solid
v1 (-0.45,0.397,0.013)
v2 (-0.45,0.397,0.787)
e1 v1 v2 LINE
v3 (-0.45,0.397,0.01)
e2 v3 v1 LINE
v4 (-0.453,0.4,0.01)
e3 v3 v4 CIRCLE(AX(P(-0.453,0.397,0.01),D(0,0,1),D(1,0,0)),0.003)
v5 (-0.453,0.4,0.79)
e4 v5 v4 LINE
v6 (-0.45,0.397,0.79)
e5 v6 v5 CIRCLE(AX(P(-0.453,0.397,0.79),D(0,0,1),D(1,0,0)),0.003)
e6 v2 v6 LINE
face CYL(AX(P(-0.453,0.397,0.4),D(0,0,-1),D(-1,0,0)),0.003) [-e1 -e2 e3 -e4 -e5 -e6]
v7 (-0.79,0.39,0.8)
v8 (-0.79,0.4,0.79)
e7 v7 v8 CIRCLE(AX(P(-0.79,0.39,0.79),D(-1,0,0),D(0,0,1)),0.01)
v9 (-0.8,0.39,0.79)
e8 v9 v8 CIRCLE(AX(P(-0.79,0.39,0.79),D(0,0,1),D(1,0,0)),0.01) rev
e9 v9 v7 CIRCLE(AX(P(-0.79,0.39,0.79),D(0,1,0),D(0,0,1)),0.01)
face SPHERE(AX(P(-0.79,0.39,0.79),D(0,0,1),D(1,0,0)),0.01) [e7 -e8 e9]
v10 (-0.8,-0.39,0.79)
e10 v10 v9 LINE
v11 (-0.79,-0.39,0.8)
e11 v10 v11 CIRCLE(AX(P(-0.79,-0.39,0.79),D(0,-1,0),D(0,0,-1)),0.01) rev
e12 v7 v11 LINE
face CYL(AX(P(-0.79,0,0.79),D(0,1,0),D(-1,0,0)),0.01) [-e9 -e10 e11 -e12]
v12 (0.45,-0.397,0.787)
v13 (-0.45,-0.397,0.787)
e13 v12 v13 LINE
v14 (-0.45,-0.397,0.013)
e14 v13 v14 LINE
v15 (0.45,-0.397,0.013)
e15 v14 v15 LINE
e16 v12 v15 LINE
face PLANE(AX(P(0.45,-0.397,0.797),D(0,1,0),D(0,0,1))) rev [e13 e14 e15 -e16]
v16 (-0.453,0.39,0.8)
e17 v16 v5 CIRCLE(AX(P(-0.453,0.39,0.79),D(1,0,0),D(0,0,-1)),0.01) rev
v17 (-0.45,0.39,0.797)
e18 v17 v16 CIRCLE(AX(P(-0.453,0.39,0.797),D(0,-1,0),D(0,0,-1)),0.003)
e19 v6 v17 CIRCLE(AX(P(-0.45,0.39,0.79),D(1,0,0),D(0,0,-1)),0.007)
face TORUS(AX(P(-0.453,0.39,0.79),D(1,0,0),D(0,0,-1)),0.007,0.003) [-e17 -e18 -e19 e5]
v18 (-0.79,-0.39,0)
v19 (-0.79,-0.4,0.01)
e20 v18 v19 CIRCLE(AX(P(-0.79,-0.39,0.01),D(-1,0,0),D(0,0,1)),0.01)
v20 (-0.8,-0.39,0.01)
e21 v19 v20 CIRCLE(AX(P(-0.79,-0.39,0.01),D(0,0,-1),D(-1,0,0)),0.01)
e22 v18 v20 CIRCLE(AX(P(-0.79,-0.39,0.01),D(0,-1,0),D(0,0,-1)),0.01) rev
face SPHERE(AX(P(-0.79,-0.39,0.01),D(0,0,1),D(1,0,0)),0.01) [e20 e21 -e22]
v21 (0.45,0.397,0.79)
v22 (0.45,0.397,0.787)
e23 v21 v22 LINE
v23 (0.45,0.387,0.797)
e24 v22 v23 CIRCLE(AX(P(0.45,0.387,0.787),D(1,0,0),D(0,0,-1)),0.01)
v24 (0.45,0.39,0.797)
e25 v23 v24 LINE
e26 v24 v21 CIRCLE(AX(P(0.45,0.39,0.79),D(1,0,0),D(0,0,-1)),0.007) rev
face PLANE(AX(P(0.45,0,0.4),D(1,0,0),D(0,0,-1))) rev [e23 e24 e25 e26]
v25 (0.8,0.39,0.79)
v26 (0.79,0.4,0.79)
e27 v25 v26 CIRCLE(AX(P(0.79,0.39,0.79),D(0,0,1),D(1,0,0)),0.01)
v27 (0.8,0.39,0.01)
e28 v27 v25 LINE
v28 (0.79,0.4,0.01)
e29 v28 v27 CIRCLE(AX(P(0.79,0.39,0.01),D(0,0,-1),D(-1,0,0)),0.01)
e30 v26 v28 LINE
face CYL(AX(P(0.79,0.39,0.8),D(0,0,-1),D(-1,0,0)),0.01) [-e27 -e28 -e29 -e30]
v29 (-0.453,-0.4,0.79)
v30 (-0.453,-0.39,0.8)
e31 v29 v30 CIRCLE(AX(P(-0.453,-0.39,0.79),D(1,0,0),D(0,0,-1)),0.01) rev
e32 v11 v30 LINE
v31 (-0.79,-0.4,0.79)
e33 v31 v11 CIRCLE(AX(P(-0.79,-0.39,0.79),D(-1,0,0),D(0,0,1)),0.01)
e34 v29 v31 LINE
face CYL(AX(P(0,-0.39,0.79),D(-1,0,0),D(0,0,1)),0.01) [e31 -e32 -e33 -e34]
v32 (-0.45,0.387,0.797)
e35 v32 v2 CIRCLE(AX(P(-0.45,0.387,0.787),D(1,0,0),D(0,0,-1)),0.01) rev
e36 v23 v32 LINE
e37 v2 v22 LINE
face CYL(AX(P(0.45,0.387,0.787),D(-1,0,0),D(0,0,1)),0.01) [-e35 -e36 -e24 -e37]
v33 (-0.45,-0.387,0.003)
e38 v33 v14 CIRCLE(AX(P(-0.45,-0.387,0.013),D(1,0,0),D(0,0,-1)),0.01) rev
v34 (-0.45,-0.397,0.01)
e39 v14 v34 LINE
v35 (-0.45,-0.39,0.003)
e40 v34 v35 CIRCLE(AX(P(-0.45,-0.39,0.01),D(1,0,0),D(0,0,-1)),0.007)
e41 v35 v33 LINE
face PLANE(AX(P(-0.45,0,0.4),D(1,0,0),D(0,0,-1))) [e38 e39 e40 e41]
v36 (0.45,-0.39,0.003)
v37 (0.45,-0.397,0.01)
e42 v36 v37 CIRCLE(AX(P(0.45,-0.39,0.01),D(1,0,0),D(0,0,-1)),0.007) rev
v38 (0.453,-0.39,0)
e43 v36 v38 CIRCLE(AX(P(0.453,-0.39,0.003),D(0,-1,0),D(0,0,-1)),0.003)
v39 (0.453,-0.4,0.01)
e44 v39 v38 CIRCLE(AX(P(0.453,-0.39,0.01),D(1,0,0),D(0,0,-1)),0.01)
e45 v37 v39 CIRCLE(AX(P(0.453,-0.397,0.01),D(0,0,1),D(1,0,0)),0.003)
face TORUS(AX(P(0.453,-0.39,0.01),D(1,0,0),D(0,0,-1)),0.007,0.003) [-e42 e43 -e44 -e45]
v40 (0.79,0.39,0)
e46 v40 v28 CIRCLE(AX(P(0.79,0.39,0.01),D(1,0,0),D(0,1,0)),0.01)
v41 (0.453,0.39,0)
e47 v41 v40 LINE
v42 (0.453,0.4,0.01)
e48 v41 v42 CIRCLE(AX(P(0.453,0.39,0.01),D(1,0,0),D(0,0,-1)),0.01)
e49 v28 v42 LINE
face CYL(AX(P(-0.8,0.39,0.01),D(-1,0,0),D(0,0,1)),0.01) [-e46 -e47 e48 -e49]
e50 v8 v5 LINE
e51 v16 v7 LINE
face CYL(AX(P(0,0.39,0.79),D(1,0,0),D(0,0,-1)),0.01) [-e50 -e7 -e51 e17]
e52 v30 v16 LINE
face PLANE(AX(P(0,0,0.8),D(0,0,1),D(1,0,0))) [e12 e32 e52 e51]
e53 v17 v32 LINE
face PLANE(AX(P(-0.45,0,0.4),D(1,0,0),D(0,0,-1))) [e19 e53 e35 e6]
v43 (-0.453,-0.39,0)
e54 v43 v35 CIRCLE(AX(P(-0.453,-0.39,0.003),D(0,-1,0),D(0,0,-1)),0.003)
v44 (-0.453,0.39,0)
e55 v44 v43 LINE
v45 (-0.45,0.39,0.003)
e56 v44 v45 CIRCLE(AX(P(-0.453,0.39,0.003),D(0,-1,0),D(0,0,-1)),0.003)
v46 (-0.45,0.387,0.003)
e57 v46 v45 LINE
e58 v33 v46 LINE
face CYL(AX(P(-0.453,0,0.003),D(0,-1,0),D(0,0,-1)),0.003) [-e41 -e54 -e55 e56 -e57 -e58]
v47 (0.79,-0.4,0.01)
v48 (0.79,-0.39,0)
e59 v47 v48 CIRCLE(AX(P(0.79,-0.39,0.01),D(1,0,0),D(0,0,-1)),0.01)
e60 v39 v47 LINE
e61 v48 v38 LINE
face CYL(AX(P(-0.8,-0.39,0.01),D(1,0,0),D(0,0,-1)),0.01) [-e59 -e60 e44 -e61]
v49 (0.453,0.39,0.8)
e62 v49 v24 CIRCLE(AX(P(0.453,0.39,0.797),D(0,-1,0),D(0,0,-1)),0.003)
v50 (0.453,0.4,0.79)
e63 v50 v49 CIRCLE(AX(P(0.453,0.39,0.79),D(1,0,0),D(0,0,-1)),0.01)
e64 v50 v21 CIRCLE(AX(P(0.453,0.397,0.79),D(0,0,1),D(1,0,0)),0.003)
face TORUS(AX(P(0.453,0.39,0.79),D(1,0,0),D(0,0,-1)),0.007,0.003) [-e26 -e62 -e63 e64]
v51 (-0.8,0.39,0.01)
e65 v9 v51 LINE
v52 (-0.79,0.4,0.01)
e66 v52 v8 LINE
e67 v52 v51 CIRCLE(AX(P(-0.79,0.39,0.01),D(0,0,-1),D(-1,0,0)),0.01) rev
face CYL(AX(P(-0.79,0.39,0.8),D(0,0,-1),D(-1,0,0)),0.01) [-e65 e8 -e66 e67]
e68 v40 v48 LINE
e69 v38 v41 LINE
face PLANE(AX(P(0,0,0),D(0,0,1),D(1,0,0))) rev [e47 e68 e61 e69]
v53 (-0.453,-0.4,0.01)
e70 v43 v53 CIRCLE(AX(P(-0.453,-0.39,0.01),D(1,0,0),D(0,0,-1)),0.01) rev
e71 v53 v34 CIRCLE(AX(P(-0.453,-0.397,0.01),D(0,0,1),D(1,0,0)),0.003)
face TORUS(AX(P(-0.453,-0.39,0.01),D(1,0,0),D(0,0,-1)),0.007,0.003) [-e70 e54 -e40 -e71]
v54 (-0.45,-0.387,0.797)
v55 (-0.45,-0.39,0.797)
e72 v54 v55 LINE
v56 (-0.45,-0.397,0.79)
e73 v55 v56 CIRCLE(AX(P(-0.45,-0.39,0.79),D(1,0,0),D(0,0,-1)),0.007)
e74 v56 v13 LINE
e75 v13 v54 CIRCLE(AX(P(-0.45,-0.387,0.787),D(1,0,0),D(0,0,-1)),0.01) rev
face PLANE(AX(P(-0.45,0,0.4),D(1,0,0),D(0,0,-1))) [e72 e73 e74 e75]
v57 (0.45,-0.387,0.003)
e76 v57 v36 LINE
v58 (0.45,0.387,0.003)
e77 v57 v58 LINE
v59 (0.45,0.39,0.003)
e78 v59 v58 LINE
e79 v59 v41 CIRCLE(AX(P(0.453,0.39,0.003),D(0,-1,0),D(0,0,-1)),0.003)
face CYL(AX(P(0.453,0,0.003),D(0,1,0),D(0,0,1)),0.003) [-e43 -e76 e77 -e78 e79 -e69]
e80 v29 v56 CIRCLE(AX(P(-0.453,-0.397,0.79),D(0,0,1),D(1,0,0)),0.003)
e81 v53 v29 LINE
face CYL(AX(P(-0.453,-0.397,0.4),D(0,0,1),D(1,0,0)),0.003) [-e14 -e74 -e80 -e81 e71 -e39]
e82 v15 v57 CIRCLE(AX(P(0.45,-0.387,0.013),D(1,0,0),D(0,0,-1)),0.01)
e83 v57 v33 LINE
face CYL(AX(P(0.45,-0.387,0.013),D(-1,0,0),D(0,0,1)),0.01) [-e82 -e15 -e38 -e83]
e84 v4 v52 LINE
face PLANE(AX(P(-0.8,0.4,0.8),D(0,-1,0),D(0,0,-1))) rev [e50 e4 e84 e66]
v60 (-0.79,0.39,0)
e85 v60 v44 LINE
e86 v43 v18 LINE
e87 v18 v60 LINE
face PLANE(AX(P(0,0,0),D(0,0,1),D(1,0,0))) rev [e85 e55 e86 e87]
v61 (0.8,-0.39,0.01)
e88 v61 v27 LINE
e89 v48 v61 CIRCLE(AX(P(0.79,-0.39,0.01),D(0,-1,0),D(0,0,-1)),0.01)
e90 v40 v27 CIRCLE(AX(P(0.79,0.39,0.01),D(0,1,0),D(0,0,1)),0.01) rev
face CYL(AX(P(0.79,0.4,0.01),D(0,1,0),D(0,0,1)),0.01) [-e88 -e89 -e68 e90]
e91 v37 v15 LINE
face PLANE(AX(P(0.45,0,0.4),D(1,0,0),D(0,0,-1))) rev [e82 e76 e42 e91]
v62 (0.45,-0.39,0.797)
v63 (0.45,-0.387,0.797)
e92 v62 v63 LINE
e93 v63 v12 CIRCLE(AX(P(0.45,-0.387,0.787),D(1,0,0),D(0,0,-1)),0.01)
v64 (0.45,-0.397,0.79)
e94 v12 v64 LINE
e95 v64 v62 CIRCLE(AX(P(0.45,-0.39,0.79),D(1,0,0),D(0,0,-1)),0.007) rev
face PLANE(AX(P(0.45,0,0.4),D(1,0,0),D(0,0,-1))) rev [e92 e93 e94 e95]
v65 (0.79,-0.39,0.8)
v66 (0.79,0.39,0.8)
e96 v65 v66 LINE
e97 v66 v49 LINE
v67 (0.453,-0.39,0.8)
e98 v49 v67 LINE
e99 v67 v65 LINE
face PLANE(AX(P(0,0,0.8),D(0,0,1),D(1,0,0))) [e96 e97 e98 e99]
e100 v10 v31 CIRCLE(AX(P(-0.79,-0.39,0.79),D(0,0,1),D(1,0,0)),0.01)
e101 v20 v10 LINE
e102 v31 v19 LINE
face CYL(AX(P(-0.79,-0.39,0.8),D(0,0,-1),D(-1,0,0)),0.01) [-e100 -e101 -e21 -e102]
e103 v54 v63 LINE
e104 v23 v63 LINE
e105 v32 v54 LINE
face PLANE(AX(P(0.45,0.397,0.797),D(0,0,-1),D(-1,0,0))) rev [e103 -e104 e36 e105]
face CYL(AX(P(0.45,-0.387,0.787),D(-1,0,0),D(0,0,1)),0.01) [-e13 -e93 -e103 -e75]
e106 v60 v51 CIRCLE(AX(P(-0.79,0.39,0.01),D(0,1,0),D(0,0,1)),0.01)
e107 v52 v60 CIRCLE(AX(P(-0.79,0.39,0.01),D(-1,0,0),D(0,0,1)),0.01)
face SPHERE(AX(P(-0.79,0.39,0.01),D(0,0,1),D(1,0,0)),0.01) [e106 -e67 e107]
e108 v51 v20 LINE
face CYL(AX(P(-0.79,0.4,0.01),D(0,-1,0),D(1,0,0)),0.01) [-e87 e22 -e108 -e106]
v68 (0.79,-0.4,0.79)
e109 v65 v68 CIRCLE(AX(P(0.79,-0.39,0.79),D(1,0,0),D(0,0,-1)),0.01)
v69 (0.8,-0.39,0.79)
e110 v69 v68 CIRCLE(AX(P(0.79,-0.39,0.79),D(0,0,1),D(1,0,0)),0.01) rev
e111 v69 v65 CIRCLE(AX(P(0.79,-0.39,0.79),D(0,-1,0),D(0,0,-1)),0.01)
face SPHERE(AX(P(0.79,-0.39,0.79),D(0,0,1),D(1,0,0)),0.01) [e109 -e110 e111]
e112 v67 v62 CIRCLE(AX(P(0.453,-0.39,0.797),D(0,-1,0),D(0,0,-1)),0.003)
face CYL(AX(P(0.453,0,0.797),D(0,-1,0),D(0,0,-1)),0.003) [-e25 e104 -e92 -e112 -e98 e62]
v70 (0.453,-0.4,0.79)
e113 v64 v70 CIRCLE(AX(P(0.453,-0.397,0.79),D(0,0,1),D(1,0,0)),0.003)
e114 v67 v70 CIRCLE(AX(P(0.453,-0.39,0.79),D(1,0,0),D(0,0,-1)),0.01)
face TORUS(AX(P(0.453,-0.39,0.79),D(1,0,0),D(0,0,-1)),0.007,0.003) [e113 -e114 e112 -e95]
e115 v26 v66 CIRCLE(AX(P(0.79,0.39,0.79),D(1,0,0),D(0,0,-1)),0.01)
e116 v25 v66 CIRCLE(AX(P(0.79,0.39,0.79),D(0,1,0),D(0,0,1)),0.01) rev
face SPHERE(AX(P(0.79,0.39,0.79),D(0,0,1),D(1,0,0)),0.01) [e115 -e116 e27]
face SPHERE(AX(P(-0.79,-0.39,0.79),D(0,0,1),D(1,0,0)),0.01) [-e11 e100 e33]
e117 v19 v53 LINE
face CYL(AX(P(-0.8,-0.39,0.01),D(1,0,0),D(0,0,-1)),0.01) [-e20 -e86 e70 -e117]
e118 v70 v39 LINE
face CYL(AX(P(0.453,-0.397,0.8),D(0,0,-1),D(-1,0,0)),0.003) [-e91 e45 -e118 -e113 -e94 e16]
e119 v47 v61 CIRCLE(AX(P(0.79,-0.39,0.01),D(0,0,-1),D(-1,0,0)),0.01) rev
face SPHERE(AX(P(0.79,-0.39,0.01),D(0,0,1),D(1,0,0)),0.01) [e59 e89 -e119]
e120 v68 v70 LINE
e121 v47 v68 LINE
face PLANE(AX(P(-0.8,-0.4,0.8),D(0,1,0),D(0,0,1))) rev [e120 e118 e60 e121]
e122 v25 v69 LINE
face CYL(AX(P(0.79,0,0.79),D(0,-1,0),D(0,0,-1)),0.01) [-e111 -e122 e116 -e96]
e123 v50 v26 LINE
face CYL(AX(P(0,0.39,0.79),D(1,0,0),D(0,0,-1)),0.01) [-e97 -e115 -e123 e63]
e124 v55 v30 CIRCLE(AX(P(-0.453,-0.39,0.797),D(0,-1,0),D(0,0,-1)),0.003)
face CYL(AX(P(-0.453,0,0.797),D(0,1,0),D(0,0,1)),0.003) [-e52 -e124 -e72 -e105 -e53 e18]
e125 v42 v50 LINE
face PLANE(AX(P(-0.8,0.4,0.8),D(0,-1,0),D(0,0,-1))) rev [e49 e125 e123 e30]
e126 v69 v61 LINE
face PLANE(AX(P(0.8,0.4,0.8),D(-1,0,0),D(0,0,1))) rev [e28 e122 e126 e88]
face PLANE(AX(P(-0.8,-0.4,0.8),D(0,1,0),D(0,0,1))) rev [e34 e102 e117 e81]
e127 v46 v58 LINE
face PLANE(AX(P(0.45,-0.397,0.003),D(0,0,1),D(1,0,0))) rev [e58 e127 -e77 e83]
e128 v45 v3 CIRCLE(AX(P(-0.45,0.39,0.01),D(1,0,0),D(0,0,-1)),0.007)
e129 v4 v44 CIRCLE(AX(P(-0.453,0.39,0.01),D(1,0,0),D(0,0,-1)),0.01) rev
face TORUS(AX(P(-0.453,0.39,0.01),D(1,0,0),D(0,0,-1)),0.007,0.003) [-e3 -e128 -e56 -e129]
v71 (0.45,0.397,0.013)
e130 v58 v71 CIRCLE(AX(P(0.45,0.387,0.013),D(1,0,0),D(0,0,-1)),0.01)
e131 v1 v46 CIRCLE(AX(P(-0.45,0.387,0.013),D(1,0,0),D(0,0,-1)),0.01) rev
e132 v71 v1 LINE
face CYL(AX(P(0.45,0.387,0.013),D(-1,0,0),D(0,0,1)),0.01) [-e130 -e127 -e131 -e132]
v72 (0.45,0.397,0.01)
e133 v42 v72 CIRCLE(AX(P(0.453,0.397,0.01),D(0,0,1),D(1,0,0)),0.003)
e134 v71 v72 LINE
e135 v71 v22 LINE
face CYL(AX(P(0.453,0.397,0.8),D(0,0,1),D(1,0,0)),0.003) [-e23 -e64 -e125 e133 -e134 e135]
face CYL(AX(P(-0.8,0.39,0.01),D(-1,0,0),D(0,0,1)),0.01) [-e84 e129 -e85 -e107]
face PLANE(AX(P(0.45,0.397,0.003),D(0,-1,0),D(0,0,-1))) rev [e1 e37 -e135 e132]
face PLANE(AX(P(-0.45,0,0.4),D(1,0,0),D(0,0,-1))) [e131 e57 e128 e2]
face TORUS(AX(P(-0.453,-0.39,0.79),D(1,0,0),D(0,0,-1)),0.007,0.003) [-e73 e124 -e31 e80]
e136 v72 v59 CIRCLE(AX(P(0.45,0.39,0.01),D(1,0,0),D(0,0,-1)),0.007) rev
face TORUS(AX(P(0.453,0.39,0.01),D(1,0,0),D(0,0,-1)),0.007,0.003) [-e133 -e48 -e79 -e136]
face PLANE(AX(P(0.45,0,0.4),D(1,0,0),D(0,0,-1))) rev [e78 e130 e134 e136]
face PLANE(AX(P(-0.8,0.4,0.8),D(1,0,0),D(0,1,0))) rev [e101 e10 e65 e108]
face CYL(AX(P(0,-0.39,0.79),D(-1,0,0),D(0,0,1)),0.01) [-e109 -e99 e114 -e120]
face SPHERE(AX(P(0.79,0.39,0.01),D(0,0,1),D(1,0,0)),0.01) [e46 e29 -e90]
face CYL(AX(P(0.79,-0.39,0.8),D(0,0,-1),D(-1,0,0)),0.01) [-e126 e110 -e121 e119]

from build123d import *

# Parameters (mm, degrees)
SKETCH1_W                           = 1.6
SKETCH1_H                           = 0.8
ALL_BODY_DEPTH                      = 0.8
CUT_OUT_THE_BODY_FOR_PIN_DEPTH      = 0.45
CUT_OUT_THE_BODY_FOR_PIN_DEPTH_BACK = 0.45
SKETCH2_OUTSIDE_W                   = 3.192
SKETCH2_OUTSIDE_H                   = 3.192
SKETCH2_OUTSIDE_W_2                 = 0.794
SKETCH2_OUTSIDE_H_2                 = 0.794
BODY_FILLET_R                       = 0.01
PIN_FILLET_A_R                      = 0.01
PIN_FILLET_B_R                      = 0.003


with BuildPart() as part:
    # Sketch1 → All body (new body)
    with BuildSketch(Plane.XY):
        Rectangle(SKETCH1_W, SKETCH1_H)
    extrude(amount=ALL_BODY_DEPTH)

    # Sketch2 outside → Cut out the body for pin (cut, two sides: drawn at the far end of the back side and taken through both)
    with BuildSketch(Plane(origin=(0, 0, 0), x_dir=(0, 0, -1), z_dir=(1, 0, 0)).offset(-CUT_OUT_THE_BODY_FOR_PIN_DEPTH_BACK)):
        with Locations((-0.4, 0)):
            Rectangle(SKETCH2_OUTSIDE_W, SKETCH2_OUTSIDE_H)
        with Locations((-0.4, 0)):
            Rectangle(SKETCH2_OUTSIDE_W_2, SKETCH2_OUTSIDE_H_2, mode=Mode.SUBTRACT)
    extrude(amount=CUT_OUT_THE_BODY_FOR_PIN_DEPTH + CUT_OUT_THE_BODY_FOR_PIN_DEPTH_BACK, mode=Mode.SUBTRACT)

    # Body fillet
    body_fillet_edges = [part.edges().sort_by_distance(p)[0] for p in [
        (0, 0.397, 0.003),
        (0, 0.397, 0.797),
        (0, -0.397, 0.797),
        (0, -0.397, 0.003),
    ]]
    fillet(body_fillet_edges, radius=BODY_FILLET_R)

    # Pin fillet a
    pin_fillet_a_edges = [part.edges().sort_by_distance(p)[0] for p in [
        (0.8, 0, 0.8),
        (-0.625, 0.4, 0),
        (0.625, -0.4, 0),
        (0.625, -0.4, 0.8),
        (-0.625, 0.4, 0.8),
        (0.625, 0.4, 0.8),
        (-0.8, 0, 0.8),
        (0.625, 0.4, 0),
        (0.8, 0, 0),
        (-0.625, -0.4, 0),
        (-0.8, 0, 0),
        (-0.8, 0.4, 0.4),
        (0.8, 0.4, 0.4),
        (0.8, -0.4, 0.4),
        (-0.8, -0.4, 0.4),
        (-0.625, -0.4, 0.8),
    ]]
    fillet(pin_fillet_a_edges, radius=PIN_FILLET_A_R)

    # Pin fillet b
    pin_fillet_b_edges = [part.edges().sort_by_distance(p)[0] for p in [
        (0.45, -0.4, 0.4),
        (0.45, 0, 0.8),
        (0.45, 0.4, 0.4),
        (0.45, 0, 0),
        (-0.45, 0.4, 0.4),
        (-0.45, 0, 0.8),
        (-0.45, -0.4, 0.4),
        (-0.45, 0, 0),
        (0.45, 0.397071068, 0.002928932),
        (0.45, -0.397071068, 0.002928932),
        (0.45, -0.397071068, 0.797071068),
        (0.45, 0.397071068, 0.797071068),
        (-0.45, -0.397071068, 0.797071068),
        (-0.45, 0.397071068, 0.797071068),
        (-0.45, -0.397071068, 0.002928932),
        (-0.45, 0.397071068, 0.002928932),
    ]]
    fillet(pin_fillet_b_edges, radius=PIN_FILLET_B_R - 0.0001)  # a hair under: the kernel refuses the full size


solid = part.part
